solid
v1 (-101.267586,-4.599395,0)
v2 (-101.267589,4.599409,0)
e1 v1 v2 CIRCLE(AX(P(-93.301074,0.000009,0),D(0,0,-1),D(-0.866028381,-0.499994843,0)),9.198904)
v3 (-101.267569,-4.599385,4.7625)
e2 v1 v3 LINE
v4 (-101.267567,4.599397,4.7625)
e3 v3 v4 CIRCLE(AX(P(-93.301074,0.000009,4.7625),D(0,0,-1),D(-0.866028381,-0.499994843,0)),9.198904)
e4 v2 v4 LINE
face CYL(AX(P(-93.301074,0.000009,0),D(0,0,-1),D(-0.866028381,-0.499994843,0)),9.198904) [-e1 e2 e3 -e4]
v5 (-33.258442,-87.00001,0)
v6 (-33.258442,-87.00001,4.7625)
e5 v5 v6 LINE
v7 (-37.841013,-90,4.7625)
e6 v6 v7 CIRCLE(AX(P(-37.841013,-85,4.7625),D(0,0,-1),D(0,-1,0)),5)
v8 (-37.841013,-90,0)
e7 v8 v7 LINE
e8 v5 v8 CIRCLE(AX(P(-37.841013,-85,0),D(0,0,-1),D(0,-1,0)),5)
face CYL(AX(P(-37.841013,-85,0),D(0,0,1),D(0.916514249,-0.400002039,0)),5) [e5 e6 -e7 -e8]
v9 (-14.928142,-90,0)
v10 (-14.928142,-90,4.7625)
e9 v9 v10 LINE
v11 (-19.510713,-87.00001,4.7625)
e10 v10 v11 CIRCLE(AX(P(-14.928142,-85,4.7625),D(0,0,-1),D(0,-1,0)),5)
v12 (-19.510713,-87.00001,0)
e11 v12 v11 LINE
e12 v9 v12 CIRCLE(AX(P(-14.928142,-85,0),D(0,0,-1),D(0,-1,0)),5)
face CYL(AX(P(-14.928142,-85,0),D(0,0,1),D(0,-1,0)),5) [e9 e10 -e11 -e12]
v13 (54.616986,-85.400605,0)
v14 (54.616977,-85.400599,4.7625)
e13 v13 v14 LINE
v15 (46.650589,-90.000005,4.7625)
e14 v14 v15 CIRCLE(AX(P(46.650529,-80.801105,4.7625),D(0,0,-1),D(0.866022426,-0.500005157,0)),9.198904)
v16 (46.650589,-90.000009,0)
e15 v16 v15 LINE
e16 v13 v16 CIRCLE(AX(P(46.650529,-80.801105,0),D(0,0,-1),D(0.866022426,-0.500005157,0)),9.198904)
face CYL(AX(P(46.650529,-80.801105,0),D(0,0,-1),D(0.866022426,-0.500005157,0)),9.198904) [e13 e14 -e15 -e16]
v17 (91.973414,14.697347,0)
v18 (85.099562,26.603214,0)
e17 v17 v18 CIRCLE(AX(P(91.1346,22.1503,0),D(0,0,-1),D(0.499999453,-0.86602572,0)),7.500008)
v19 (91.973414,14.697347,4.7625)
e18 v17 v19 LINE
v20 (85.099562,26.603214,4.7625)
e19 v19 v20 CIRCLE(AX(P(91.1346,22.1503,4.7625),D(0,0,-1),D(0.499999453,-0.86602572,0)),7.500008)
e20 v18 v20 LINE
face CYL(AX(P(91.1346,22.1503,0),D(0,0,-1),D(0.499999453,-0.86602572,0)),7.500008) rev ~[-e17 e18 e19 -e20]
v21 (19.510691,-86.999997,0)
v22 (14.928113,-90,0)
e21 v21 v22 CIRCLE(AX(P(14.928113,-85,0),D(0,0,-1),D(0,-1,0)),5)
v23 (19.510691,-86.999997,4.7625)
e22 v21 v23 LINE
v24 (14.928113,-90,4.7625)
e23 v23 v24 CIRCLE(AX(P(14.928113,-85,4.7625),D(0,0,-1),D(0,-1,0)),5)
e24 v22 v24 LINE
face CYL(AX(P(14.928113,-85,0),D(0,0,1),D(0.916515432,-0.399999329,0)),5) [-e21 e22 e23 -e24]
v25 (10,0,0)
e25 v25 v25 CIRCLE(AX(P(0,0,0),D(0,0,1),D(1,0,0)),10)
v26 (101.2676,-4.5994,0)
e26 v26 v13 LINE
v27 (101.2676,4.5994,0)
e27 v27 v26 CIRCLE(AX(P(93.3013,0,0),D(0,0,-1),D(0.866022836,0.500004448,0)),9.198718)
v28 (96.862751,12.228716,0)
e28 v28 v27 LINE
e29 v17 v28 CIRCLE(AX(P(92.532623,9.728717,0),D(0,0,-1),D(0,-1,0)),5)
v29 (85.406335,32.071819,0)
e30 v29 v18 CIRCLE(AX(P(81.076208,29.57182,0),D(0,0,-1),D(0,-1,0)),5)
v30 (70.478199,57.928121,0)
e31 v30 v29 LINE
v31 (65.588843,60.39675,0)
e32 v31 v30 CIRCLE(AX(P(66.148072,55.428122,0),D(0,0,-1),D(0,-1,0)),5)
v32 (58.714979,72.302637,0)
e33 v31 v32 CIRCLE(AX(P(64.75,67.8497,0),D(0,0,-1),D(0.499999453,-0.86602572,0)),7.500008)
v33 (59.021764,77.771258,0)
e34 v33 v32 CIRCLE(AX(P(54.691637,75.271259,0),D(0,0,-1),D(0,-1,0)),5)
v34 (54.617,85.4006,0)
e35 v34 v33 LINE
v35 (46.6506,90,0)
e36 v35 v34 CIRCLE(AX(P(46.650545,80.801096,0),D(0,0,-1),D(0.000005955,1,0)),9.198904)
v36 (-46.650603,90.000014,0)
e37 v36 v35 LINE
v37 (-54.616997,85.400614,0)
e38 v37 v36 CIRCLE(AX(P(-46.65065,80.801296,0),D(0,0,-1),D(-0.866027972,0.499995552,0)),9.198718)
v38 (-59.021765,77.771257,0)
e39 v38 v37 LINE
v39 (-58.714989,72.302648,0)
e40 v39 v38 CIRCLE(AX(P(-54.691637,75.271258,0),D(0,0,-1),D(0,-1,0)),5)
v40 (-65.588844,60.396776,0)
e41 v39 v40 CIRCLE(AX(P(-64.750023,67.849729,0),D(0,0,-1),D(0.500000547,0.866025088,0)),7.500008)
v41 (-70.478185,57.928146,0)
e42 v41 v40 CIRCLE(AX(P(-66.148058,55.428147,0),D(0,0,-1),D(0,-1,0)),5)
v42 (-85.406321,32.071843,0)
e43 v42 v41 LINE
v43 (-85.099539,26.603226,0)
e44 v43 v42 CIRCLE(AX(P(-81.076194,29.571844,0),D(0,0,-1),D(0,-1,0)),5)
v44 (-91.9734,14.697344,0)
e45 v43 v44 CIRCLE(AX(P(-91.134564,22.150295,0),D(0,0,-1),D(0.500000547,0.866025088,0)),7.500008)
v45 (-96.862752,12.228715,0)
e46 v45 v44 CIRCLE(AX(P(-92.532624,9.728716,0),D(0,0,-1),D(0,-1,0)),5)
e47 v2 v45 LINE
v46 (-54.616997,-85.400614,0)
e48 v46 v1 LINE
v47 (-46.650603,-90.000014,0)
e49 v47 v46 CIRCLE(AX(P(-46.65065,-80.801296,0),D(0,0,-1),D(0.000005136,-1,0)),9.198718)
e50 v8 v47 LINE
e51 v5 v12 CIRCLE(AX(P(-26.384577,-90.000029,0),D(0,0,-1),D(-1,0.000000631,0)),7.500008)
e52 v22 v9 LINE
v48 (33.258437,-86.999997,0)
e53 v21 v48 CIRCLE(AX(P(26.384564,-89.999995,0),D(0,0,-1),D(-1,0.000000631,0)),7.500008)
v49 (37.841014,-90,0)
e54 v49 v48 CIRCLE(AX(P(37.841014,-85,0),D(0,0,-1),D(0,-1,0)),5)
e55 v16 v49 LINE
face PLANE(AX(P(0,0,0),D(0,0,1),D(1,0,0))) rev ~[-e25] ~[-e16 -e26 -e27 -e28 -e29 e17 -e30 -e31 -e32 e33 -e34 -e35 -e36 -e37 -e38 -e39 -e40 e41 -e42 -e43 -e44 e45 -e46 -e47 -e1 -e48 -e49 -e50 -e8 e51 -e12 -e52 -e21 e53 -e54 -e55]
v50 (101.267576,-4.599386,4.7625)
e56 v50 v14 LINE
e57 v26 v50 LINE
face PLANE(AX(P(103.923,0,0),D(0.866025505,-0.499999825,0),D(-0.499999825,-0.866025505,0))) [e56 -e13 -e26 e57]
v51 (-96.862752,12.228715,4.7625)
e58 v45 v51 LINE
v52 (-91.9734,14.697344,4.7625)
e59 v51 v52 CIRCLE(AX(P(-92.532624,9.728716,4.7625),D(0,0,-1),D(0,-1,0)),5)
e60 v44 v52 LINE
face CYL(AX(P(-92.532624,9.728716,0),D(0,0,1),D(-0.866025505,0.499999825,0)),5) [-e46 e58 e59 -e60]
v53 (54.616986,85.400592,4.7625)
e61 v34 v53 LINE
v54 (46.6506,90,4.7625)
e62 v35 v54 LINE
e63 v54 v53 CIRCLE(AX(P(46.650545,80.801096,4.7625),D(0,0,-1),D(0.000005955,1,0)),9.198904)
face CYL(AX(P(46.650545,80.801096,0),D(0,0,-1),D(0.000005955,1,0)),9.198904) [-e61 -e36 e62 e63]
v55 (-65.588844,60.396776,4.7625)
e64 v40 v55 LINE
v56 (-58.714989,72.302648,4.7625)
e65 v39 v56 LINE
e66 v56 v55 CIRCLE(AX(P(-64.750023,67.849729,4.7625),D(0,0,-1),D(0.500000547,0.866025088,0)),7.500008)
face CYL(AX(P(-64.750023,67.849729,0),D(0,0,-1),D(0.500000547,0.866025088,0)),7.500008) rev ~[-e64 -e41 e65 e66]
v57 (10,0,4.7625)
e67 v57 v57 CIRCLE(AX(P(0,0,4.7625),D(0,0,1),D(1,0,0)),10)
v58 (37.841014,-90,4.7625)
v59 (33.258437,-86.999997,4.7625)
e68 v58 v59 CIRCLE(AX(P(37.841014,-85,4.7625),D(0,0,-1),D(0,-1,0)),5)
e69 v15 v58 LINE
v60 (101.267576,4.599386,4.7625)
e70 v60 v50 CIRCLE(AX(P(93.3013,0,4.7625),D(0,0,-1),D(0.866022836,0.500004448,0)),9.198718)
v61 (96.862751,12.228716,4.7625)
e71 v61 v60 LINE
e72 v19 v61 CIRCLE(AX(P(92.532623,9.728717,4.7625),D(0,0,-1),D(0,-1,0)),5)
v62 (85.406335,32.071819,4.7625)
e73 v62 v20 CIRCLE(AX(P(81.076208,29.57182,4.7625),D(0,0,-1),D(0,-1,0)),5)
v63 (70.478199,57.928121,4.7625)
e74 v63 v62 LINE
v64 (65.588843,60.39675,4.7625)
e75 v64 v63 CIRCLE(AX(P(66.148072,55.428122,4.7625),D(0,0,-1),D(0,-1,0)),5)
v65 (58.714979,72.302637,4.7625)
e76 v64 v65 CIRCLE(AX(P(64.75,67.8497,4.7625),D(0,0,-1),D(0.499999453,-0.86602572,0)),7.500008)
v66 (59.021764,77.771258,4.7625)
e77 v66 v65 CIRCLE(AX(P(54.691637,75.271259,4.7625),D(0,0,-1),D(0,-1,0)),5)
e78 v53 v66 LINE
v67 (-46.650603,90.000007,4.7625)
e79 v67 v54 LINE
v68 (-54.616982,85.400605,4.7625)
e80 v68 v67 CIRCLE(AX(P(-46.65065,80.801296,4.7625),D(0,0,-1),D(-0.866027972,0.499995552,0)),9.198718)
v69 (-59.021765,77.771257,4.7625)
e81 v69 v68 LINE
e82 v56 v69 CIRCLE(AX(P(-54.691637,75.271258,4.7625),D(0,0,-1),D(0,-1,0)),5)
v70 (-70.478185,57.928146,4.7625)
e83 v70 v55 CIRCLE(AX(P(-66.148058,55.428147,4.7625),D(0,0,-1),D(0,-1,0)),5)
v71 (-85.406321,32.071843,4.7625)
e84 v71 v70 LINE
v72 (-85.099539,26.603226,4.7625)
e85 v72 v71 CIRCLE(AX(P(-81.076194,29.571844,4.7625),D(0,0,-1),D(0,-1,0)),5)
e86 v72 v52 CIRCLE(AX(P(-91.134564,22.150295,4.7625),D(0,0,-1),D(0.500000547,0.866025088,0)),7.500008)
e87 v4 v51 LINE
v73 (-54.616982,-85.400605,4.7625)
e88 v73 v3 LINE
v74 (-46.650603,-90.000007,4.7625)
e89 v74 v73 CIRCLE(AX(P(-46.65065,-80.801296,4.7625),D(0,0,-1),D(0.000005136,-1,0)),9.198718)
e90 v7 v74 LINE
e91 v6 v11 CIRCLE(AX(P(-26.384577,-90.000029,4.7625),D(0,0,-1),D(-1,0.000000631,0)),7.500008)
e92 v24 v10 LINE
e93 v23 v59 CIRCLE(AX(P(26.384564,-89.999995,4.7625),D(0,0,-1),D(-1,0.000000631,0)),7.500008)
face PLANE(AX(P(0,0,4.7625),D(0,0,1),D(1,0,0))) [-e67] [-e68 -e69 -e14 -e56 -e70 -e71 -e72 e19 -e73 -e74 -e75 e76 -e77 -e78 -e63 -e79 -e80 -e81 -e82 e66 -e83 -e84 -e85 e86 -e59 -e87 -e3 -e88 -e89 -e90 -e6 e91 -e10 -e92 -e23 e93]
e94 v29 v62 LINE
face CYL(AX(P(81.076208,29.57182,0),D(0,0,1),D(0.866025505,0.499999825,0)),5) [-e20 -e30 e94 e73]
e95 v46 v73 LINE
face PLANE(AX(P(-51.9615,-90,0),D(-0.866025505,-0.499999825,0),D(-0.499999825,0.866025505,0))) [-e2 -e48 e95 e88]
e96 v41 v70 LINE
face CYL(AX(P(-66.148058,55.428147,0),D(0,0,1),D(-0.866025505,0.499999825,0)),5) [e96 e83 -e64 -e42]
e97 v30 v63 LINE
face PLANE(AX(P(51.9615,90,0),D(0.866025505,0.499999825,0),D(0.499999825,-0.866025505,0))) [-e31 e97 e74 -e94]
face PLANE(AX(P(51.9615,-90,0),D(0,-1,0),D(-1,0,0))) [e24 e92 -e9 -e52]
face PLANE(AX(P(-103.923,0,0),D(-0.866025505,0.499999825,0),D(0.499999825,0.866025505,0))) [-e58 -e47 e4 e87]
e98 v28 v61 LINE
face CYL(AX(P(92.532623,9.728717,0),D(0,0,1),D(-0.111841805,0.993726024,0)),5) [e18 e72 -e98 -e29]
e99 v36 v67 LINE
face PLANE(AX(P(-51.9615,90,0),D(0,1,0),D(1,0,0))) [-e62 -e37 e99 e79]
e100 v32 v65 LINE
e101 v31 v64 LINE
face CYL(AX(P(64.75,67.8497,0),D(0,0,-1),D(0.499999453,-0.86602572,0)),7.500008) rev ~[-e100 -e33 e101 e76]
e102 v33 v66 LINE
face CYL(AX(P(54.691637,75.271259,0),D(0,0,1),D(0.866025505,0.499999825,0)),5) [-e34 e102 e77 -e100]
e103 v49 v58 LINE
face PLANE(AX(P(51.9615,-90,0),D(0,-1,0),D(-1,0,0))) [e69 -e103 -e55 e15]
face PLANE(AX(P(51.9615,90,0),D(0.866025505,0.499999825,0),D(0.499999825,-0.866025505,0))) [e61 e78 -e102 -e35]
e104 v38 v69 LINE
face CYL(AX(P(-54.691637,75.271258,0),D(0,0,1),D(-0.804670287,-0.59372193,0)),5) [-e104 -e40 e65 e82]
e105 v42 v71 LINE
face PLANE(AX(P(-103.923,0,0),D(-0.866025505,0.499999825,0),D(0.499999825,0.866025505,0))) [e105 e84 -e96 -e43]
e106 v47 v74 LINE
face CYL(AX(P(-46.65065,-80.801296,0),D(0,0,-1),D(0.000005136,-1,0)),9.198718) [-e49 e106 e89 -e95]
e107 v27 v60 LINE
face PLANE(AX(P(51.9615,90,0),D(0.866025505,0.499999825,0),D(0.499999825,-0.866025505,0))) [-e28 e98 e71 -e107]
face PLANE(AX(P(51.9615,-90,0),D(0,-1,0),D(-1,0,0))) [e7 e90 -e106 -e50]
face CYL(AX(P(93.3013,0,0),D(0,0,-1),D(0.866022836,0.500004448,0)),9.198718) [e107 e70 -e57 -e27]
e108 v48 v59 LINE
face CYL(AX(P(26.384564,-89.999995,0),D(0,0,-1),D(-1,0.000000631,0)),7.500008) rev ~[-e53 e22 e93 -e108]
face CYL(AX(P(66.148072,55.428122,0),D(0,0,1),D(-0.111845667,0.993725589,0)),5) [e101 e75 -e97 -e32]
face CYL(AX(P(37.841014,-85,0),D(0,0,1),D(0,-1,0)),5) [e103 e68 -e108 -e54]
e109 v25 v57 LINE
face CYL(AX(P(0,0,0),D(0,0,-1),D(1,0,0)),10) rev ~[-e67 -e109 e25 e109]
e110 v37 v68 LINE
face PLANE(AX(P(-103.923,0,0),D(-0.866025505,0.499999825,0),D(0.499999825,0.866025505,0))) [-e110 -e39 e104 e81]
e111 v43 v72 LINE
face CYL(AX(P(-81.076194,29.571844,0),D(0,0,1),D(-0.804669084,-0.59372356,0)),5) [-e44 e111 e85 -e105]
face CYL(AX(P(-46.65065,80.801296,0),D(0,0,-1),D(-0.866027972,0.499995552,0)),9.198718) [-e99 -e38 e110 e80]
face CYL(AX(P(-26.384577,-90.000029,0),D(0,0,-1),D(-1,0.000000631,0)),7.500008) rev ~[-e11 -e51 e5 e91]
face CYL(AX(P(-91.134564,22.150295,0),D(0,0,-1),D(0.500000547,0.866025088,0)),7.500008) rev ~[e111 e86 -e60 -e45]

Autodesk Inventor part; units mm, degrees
ref_plane "YZ Plane" through (0, 0, 0) normal (1, 0, 0) x (0, 1, 0)
ref_plane "XZ Plane" through (0, 0, 0) normal (0, 1, 0) x (-1, 0, 0)
ref_plane "XY Plane" through (0, 0, 0) normal (0, 0, 1) x (1, 0, 0)
sketch "Sketch1" plane through (0, 0, 0) normal (0, 0, 1) x (1, 0, 0)
  line L0 (51.9615, 90) -> (103.923, 0)
  line L1 (103.923, 0) -> (51.9615, -90)
  line L2 (51.9615, -90) -> (-51.9615, -90)
  line L3 (-51.9615, -90) -> (-103.923, 0)
  line L4 (-103.923, 0) -> (-51.9615, 90)
  line L5 (-51.9615, 90) -> (51.9615, 90)
  circle A0 centre (0, 0) radius 10
  dimension "d3" = 180
  dimension "d13" = 20
extrude "Extrusion1" add sketch "Sketch1" along normal blind 4.7625
sketch "Sketch2" plane through (0, 0, 0) normal (0, 0, -1) x (-1, 0, 0)
  line L0 (-51.9615, 90) -> (-103.923, 0) projected
  line L1 (51.9615, -90) -> (103.923, 0) projected
  line L2 (103.923, 0) -> (51.9615, 90) projected
  line L3 (51.9615, 90) -> (-51.9615, 90) projected
  line L4 (-51.9615, 90) -> (0, 180) construction
  line L5 (0, 180) -> (51.9615, 90) construction
  arc A0 (-68.5, 61.3545) -> (-61, 74.3449) centre (-64.75, 67.8497) ccw
  arc A1 (-46.6506, 90) -> (-54.617, 85.4006) centre (-46.6506, 80.8013) ccw
  arc A2 (-94.8846, 15.6551) -> (-87.3846, 28.6455) centre (-91.1346, 22.1503) ccw
  line L6 (-103.923, 0) -> (-155.8846, -90) construction
  line L7 (-155.8846, -90) -> (-51.9615, -90) construction
  line L8 (-103.923, 0) -> (-51.9615, -90) projected
  arc A3 (-101.2676, 4.5994) -> (-101.2676, -4.5994) centre (-93.3013, 0) ccw
  point P0 (0, 0)
  dimension "d5" = 7.5
  dimension "d6" = 129.5
  dimension "d7" = 9.1987
  dimension "d8" = 93.3013
  dimension "d9" = 129.5
extrude "Extrusion2" cut sketch "Sketch2" against normal up to next
pattern_circular "Circular Pattern1" count 3 over 360 about axis through (0, 0, 0) along (0, 0, 1) of "Extrusion2"
fillet "Fillet1" radius 5 12 edges at (61, 74.3449, 2.3813) (68.5, 61.3545, 2.3813) (87.3846, 28.6455, 2.3813) (94.8846, 15.6551, 2.3813) (-68.5, 61.3545, 2.3813) (-61, 74.3449, 2.3813) (-94.8846, 15.6551, 2.3813) (-87.3846, 28.6455, 2.3813) (-18.8846, -90, 2.3813) (-33.8846, -90, 2.3813) (33.8846, -90, 2.3813) (18.8846, -90, 2.3813)
equation "\"d9\" = d6"
properties part number "Heatbed_Insulator_Cork" material "Cork Tiles"
